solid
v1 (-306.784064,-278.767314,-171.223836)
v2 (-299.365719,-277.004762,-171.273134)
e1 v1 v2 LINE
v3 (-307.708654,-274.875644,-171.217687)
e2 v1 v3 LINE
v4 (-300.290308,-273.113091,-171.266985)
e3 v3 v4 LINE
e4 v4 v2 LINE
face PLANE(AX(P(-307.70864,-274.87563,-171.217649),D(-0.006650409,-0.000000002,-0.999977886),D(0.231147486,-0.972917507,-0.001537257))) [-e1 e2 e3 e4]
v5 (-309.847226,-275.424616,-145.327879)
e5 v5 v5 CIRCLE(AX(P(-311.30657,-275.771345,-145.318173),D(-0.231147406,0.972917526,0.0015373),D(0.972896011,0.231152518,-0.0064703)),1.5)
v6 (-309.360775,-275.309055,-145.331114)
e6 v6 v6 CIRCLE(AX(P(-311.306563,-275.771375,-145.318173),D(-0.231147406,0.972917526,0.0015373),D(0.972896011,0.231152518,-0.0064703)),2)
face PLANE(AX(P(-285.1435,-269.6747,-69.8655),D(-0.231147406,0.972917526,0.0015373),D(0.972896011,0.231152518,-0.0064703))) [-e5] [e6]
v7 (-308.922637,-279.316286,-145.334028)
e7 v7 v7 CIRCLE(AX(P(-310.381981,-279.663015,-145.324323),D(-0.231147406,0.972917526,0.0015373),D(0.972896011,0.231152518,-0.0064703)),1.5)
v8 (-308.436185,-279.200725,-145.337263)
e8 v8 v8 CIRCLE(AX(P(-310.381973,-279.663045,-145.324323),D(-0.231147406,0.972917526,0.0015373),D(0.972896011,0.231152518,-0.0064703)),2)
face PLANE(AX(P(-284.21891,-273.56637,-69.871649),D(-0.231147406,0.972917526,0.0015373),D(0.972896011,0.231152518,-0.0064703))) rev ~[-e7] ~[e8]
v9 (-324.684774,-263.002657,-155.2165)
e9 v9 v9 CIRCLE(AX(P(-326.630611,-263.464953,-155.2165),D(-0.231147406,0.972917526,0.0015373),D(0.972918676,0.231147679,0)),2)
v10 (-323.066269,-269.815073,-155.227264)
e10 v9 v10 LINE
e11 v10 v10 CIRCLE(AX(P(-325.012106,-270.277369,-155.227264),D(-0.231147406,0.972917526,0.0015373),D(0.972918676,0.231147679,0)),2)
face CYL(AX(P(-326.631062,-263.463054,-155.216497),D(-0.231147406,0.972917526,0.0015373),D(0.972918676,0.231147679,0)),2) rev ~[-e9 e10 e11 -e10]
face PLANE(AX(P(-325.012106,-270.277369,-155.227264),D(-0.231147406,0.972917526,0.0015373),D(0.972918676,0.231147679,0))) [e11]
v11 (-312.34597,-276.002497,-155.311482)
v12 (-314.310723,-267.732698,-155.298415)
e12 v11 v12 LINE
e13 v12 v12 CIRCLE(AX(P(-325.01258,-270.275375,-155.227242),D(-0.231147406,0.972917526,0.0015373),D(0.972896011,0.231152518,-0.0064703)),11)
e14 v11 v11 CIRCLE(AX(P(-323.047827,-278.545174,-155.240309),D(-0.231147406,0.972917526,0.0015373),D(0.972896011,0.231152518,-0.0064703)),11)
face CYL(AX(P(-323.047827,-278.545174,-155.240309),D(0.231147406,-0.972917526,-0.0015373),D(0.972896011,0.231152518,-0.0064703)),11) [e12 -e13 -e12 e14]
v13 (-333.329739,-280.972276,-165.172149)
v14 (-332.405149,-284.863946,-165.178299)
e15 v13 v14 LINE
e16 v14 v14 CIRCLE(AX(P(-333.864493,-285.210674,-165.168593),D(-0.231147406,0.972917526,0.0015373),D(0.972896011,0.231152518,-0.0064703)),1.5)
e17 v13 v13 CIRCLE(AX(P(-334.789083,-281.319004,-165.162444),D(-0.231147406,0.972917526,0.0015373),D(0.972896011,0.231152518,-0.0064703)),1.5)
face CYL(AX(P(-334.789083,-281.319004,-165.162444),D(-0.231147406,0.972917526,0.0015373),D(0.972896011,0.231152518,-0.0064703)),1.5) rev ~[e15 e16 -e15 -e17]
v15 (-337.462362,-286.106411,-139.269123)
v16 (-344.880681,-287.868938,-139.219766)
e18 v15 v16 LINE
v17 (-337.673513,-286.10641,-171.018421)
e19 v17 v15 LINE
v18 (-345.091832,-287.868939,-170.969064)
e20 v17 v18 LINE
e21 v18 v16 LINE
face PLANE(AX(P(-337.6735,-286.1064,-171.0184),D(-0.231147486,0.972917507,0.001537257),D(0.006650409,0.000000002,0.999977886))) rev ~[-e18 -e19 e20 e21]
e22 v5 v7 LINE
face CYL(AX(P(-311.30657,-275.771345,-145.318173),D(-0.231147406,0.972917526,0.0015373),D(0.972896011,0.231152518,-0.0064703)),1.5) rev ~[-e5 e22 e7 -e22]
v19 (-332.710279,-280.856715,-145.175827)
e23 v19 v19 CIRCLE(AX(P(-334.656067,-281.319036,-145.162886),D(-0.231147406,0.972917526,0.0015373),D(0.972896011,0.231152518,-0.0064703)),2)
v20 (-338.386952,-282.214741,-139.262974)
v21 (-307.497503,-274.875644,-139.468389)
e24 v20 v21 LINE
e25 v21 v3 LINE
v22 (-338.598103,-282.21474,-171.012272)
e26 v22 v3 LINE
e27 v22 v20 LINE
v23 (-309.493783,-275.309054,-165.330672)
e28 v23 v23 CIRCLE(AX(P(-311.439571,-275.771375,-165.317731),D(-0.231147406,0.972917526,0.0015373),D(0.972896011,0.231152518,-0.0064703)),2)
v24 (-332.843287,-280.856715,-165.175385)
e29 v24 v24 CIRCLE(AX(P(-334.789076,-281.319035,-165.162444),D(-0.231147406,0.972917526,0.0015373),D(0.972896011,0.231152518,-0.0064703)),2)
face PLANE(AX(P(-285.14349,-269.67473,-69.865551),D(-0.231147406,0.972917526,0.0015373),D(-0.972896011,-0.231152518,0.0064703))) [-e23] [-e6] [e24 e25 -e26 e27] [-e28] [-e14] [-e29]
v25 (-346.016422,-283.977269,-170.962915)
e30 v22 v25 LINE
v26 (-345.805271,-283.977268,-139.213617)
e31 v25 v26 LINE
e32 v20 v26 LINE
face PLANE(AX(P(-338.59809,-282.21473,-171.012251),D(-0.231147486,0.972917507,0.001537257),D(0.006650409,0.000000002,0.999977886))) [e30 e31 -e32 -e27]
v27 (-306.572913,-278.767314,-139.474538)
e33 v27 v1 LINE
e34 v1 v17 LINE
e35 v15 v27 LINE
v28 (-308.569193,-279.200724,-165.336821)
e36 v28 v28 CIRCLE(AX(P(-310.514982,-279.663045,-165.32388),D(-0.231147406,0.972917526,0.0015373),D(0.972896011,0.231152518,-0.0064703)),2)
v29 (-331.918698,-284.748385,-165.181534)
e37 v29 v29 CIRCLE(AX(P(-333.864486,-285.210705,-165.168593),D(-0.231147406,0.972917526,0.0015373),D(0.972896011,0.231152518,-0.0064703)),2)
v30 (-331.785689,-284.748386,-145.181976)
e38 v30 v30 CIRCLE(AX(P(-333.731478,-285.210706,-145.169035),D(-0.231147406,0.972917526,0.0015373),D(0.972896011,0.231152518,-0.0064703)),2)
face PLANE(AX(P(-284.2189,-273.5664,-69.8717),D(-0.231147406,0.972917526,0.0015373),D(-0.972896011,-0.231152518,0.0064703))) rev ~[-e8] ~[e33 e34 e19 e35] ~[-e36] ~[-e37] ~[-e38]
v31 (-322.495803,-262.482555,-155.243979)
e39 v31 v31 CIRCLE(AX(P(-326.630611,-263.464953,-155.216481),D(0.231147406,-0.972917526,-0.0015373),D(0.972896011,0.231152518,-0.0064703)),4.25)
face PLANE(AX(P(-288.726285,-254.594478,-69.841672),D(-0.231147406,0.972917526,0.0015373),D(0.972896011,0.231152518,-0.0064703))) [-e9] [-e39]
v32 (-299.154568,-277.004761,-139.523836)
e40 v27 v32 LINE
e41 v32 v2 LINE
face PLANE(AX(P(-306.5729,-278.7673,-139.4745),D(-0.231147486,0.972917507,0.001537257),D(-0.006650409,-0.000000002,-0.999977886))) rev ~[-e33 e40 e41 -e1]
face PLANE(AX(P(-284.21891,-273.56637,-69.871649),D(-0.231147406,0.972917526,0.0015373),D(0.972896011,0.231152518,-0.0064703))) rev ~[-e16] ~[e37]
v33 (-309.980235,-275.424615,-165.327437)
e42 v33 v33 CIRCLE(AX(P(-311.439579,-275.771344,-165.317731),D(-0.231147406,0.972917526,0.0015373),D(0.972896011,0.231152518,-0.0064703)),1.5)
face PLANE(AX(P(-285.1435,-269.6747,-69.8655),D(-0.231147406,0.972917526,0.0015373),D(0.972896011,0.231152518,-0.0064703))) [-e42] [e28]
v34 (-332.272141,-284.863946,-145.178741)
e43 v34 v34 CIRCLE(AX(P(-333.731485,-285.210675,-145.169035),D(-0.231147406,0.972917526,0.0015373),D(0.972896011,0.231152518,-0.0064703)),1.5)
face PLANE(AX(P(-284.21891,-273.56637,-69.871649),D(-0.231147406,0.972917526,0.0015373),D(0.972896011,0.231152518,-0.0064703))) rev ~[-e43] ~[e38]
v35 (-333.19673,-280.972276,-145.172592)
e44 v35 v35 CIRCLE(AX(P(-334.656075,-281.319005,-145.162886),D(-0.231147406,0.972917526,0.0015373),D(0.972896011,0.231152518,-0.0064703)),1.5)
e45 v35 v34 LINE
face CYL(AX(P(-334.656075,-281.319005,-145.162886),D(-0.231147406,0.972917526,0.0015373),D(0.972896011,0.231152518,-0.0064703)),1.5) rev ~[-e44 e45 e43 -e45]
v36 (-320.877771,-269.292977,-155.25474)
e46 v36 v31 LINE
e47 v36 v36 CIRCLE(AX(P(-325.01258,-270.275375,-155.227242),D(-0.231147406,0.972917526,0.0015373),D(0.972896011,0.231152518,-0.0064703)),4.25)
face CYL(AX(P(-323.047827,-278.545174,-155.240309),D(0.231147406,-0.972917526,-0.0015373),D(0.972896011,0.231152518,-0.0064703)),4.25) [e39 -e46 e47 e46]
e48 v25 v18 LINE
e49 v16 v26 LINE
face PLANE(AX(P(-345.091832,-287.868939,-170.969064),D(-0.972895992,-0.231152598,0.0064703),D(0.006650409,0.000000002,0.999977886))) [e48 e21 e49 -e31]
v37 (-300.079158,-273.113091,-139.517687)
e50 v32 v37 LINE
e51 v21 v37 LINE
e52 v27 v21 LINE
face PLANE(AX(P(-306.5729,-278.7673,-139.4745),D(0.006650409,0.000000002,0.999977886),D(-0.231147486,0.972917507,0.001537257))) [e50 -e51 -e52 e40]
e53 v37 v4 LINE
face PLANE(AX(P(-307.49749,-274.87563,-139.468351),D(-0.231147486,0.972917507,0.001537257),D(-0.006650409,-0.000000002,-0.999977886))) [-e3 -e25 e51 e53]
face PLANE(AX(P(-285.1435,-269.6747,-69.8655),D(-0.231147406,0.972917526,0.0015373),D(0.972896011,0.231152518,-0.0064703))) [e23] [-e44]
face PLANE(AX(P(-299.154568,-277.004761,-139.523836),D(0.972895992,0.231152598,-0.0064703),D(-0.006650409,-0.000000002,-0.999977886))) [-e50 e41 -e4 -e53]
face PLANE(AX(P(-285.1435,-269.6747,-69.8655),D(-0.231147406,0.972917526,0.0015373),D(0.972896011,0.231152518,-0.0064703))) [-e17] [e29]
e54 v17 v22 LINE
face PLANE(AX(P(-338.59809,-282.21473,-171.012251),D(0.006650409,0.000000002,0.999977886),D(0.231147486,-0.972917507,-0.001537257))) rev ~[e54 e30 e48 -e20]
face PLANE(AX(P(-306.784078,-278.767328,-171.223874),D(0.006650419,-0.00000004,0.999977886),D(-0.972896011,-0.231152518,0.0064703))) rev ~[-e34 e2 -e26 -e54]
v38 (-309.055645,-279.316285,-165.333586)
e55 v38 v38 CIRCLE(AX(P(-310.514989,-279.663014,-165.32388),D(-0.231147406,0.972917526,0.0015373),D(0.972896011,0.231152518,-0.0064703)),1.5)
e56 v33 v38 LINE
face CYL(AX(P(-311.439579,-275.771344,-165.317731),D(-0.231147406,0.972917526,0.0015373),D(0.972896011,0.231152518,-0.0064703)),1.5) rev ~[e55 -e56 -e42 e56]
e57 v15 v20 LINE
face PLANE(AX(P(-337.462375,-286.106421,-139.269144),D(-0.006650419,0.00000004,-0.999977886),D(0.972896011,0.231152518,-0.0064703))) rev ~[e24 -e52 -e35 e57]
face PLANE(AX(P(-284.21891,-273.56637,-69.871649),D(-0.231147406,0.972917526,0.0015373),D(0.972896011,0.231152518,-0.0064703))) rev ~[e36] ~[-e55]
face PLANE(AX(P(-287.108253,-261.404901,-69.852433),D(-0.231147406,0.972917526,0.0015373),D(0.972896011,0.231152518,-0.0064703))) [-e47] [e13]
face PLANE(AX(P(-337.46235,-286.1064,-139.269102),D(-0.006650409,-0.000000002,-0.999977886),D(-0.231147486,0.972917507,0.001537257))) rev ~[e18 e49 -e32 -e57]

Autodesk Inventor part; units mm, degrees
ref_plane "РабПлоскость1" through (-284.2189, -273.5664, -69.8717) normal (-0.2311474, 0.9729175, 0.0015373) x (-0.972896, -0.2311526, 0.0064703)
sketch "Эскиз1" plane through (-284.2189, -273.5664, -69.8717) normal (-0.2311474, 0.9729175, 0.0015373) x (-0.972896, -0.2311526, 0.0064703)
  line L0 (22.5, -101.5) -> (54.25, -101.5)
  line L1 (54.25, -101.5) -> (54.25, -69.75)
  line L2 (54.25, -69.75) -> (22.5, -69.75)
  line L3 (22.5, -69.75) -> (22.5, -101.5)
  circle A0 centre (38.375, -85.625) radius 15.75 projected
  line L4 (38.375, -101.375) -> (38.375, -107.7067)
  point P0 (-339.2989, 71.7603)
  point P1 (22.5, -91.5)
  point P2 (38.375, -101.375)
  point P3 (38.375, -102.625)
  dimension "d6" = 12
  dimension "d7" = 10
  dimension "d8" = 4
  dimension "d9" = 4
  dimension "d16" = 12
  dimension "d0" = 31.75
  dimension "d1" = 31.75
extrude "Выдавливание1" add sketch "Эскиз1" along normal blind 4 contours L3 L2 L1 L0 | A0
sketch "Эскиз2" plane through (-285.1435, -269.6747, -69.8655) normal (-0.2311474, 0.9729175, 0.0015373) x (0.972896, 0.2311526, -0.0064703)
  line L0 (-54.25, 101.5) -> (-54.25, 69.75) projected
  line L1 (-54.25, 85.625) -> (-22.5, 85.625)
  line L2 (-22.5, 69.75) -> (-22.5, 101.5) projected
  line L3 (-54.25, 69.75) -> (-22.5, 69.75) projected
  line L4 (-50.375, 85.625) -> (-50.375, 101.5)
  line L5 (-36.5891, 93.625) -> (-22.5, 93.625)
  line L6 (-36.5891, 93.625) -> (-54.25, 93.625)
  line L7 (-50.375, 85.625) -> (-50.375, 68.9602)
  line L8 (-50.375, 75.625) -> (-22.5, 75.625)
  line L9 (-26.375, 103.5) -> (-26.375, 69.75)
  circle A0 centre (-50.375, 75.625) radius 2
  circle A1 centre (-26.375, 75.625) radius 2
  line L10 (-38.375, 72.7459) -> (-38.375, 103.5)
  line L11 (-38.375, 72.7459) -> (-38.375, 69.75)
  point P0 (339.2989, -71.7603)
  point P1 (-49.5, 101.5)
  point P2 (-38.375, 101.5)
  point P3 (-22.5, 85.625)
  point P4 (-54.25, 101.5)
  dimension "d5" = 8
  dimension "d6" = 12
  dimension "d7" = 10
  dimension "d8" = 4
  dimension "d9" = 4
  dimension "d16" = 12
sketch "Эскиз3" plane through (-285.1435, -269.6747, -69.8655) normal (-0.2311474, 0.9729175, 0.0015373) x (0.972896, 0.2311526, -0.0064703)
  circle A0 centre (-50.375, 95.625) radius 2
  circle A1 centre (-26.375, 95.625) radius 2
  line L0 (-54.25, 69.75) -> (-22.5, 69.75) projected
  line L1 (-38.375, 69.75) -> (-38.375, 101.5)
  line L2 (-38.375, 101.5) -> (-54.25, 85.625)
  line L3 (-54.25, 85.625) -> (-22.5, 85.625)
  point P0 (339.2989, -71.7603)
  point P1 (-50.375, 93.5625)
  dimension "d10" = 4
  dimension "d11" = 4
  dimension "d17" = 7.9375
  dimension "d18" = 15.875
  dimension "d19" = 10
  dimension "d20" = 10
  dimension "d21" = 12
extrude "Выдавливание2" cut sketch "Эскиз3" against normal blind 10 contours A0 | A1
extrude "Выдавливание3" cut sketch "Эскиз2" against normal blind 10 contours A0 L8 L7 | L7 A0 | L7 L8 A0 | A1 L8 L9 | L9 L8 A1 | L8 L9 A1 | L9 L8 A1
sketch "Эскиз4" plane through (-285.1435, -269.6747, -69.8655) normal (-0.2311474, 0.9729175, 0.0015373) x (0.972896, 0.2311526, -0.0064703)
  line L0 (-54.25, 101.5) -> (-54.25, 69.75) projected
  line L1 (-54.25, 85.625) -> (-22.5, 85.625)
  line L2 (-22.5, 69.75) -> (-22.5, 101.5) projected
  line L3 (-38.375, 101.5) -> (-38.375, 69.75)
  line L4 (-54.25, 69.75) -> (-22.5, 69.75) projected
  circle A0 centre (-38.375, 85.625) radius 4.25
  point P0 (339.2989, -71.7603)
  dimension "d22" = 8.5
extrude "Выдавливание4" add sketch "Эскиз4" along normal blind 15.5 contours A0 L3 L1 | L1 L3 A0 | L3 A0 L1 | L1 A0 L3
sketch "Эскиз5" plane through (-326.6306, -263.465, -155.2165) normal (-0.2311474, 0.9729175, 0.0015373) x (0.9729187, 0.2311477, 0)
  circle A0 centre (0, 0) radius 2
  point P0 (378.6843, -154.9383)
  dimension "d25" = 4
extrude "Выдавливание5" cut sketch "Эскиз5" against normal blind 7
thread "Резьба1" size "M4x0.7" class "6H" standard "ANSI Metric M Profile" full length
sketch "Эскиз6" plane through (-337.6735, -286.1064, -171.0184) normal (-0.972896, -0.2311526, 0.0064703) x (0.0066504, 0, 0.9999779)
  line L0 (0, 4) -> (31.75, 4) projected
  line L1 (31.75, 4) -> (0, 4)
  line L2 (0, 4) -> (0, 0)
  line L3 (0, 0) -> (31.75, 0)
  line L4 (31.75, 0) -> (31.75, 4)
  point P0 (173.2603, 200.5685)
  point P1 (0, 4)
ref_plane "РабПлоскость2" through (-345.4521, -286.2315, -166.64) normal (0.972896, 0.2311526, -0.0064703) x (-0.2311474, 0.9729175, 0.0015373)
extrude "Выдавливание6" add sketch "Эскиз6" along normal up to surface (7.625 mm away)
sketch "Эскиз7" plane through (-306.5729, -278.7673, -139.4745) normal (0.972896, 0.2311526, -0.0064703) x (-0.0066504, 0, -0.9999779)
  line L0 (0, 0) -> (31.75, 0) projected
  line L1 (0, 4) -> (31.75, 4) projected
  line L2 (31.75, 0) -> (0, 0)
  line L3 (0, 0) -> (0, 4)
  line L4 (0, 4) -> (31.75, 4)
  line L5 (31.75, 4) -> (31.75, 0)
  point P0 (-141.5103, 200.5685)
  point P1 (31.75, 4)
ref_plane "РабПлоскость3" through (-299.726, -275.3674, -166.9441) normal (-0.972896, -0.2311526, 0.0064703) x (0.0066504, 0, 0.9999779)
extrude "Выдавливание7" add sketch "Эскиз7" along normal up to surface (7.625 mm away)
sketch "Эскиз8" plane through (-285.1435, -269.6747, -69.8655) normal (-0.2311474, 0.9729175, 0.0015373) x (0.972896, 0.2311526, -0.0064703)
  circle A0 centre (-38.375, 85.625) radius 4.25 projected
  circle A1 centre (-38.375, 85.625) radius 11
  point P0 (339.2989, -71.7603)
  dimension "d34" = 22
extrude "Выдавливание8" add sketch "Эскиз8" along normal blind 8.5
sketch "Эскиз9" plane through (-285.1435, -269.6747, -69.8655) normal (-0.2311474, 0.9729175, 0.0015373) x (0.972896, 0.2311526, -0.0064703)
  circle A0 centre (-26.375, 75.625) radius 2 projected
  circle A1 centre (-26.375, 95.625) radius 2 projected
  circle A2 centre (-50.375, 75.625) radius 2 projected
  circle A3 centre (-50.375, 95.625) radius 2 projected
  circle A4 centre (-26.375, 75.625) radius 1.5
  circle A5 centre (-26.375, 95.625) radius 1.5
  circle A6 centre (-50.375, 95.625) radius 1.5
  circle A7 centre (-50.375, 75.625) radius 1.5
  point P0 (339.2989, -71.7603)
  dimension "d37" = 3
  dimension "d38" = 3
  dimension "d39" = 3
  dimension "d40" = 3
ref_plane "РабПлоскость4" through (-375.5638, -295.1043, -173.6384) normal (-0.2311474, 0.9729175, 0.0015373) x (0.0066504, 0, 0.9999779)
extrude "Выдавливание9" add sketch "Эскиз9" against normal up to surface (4 mm away)
properties part number "ступица"
